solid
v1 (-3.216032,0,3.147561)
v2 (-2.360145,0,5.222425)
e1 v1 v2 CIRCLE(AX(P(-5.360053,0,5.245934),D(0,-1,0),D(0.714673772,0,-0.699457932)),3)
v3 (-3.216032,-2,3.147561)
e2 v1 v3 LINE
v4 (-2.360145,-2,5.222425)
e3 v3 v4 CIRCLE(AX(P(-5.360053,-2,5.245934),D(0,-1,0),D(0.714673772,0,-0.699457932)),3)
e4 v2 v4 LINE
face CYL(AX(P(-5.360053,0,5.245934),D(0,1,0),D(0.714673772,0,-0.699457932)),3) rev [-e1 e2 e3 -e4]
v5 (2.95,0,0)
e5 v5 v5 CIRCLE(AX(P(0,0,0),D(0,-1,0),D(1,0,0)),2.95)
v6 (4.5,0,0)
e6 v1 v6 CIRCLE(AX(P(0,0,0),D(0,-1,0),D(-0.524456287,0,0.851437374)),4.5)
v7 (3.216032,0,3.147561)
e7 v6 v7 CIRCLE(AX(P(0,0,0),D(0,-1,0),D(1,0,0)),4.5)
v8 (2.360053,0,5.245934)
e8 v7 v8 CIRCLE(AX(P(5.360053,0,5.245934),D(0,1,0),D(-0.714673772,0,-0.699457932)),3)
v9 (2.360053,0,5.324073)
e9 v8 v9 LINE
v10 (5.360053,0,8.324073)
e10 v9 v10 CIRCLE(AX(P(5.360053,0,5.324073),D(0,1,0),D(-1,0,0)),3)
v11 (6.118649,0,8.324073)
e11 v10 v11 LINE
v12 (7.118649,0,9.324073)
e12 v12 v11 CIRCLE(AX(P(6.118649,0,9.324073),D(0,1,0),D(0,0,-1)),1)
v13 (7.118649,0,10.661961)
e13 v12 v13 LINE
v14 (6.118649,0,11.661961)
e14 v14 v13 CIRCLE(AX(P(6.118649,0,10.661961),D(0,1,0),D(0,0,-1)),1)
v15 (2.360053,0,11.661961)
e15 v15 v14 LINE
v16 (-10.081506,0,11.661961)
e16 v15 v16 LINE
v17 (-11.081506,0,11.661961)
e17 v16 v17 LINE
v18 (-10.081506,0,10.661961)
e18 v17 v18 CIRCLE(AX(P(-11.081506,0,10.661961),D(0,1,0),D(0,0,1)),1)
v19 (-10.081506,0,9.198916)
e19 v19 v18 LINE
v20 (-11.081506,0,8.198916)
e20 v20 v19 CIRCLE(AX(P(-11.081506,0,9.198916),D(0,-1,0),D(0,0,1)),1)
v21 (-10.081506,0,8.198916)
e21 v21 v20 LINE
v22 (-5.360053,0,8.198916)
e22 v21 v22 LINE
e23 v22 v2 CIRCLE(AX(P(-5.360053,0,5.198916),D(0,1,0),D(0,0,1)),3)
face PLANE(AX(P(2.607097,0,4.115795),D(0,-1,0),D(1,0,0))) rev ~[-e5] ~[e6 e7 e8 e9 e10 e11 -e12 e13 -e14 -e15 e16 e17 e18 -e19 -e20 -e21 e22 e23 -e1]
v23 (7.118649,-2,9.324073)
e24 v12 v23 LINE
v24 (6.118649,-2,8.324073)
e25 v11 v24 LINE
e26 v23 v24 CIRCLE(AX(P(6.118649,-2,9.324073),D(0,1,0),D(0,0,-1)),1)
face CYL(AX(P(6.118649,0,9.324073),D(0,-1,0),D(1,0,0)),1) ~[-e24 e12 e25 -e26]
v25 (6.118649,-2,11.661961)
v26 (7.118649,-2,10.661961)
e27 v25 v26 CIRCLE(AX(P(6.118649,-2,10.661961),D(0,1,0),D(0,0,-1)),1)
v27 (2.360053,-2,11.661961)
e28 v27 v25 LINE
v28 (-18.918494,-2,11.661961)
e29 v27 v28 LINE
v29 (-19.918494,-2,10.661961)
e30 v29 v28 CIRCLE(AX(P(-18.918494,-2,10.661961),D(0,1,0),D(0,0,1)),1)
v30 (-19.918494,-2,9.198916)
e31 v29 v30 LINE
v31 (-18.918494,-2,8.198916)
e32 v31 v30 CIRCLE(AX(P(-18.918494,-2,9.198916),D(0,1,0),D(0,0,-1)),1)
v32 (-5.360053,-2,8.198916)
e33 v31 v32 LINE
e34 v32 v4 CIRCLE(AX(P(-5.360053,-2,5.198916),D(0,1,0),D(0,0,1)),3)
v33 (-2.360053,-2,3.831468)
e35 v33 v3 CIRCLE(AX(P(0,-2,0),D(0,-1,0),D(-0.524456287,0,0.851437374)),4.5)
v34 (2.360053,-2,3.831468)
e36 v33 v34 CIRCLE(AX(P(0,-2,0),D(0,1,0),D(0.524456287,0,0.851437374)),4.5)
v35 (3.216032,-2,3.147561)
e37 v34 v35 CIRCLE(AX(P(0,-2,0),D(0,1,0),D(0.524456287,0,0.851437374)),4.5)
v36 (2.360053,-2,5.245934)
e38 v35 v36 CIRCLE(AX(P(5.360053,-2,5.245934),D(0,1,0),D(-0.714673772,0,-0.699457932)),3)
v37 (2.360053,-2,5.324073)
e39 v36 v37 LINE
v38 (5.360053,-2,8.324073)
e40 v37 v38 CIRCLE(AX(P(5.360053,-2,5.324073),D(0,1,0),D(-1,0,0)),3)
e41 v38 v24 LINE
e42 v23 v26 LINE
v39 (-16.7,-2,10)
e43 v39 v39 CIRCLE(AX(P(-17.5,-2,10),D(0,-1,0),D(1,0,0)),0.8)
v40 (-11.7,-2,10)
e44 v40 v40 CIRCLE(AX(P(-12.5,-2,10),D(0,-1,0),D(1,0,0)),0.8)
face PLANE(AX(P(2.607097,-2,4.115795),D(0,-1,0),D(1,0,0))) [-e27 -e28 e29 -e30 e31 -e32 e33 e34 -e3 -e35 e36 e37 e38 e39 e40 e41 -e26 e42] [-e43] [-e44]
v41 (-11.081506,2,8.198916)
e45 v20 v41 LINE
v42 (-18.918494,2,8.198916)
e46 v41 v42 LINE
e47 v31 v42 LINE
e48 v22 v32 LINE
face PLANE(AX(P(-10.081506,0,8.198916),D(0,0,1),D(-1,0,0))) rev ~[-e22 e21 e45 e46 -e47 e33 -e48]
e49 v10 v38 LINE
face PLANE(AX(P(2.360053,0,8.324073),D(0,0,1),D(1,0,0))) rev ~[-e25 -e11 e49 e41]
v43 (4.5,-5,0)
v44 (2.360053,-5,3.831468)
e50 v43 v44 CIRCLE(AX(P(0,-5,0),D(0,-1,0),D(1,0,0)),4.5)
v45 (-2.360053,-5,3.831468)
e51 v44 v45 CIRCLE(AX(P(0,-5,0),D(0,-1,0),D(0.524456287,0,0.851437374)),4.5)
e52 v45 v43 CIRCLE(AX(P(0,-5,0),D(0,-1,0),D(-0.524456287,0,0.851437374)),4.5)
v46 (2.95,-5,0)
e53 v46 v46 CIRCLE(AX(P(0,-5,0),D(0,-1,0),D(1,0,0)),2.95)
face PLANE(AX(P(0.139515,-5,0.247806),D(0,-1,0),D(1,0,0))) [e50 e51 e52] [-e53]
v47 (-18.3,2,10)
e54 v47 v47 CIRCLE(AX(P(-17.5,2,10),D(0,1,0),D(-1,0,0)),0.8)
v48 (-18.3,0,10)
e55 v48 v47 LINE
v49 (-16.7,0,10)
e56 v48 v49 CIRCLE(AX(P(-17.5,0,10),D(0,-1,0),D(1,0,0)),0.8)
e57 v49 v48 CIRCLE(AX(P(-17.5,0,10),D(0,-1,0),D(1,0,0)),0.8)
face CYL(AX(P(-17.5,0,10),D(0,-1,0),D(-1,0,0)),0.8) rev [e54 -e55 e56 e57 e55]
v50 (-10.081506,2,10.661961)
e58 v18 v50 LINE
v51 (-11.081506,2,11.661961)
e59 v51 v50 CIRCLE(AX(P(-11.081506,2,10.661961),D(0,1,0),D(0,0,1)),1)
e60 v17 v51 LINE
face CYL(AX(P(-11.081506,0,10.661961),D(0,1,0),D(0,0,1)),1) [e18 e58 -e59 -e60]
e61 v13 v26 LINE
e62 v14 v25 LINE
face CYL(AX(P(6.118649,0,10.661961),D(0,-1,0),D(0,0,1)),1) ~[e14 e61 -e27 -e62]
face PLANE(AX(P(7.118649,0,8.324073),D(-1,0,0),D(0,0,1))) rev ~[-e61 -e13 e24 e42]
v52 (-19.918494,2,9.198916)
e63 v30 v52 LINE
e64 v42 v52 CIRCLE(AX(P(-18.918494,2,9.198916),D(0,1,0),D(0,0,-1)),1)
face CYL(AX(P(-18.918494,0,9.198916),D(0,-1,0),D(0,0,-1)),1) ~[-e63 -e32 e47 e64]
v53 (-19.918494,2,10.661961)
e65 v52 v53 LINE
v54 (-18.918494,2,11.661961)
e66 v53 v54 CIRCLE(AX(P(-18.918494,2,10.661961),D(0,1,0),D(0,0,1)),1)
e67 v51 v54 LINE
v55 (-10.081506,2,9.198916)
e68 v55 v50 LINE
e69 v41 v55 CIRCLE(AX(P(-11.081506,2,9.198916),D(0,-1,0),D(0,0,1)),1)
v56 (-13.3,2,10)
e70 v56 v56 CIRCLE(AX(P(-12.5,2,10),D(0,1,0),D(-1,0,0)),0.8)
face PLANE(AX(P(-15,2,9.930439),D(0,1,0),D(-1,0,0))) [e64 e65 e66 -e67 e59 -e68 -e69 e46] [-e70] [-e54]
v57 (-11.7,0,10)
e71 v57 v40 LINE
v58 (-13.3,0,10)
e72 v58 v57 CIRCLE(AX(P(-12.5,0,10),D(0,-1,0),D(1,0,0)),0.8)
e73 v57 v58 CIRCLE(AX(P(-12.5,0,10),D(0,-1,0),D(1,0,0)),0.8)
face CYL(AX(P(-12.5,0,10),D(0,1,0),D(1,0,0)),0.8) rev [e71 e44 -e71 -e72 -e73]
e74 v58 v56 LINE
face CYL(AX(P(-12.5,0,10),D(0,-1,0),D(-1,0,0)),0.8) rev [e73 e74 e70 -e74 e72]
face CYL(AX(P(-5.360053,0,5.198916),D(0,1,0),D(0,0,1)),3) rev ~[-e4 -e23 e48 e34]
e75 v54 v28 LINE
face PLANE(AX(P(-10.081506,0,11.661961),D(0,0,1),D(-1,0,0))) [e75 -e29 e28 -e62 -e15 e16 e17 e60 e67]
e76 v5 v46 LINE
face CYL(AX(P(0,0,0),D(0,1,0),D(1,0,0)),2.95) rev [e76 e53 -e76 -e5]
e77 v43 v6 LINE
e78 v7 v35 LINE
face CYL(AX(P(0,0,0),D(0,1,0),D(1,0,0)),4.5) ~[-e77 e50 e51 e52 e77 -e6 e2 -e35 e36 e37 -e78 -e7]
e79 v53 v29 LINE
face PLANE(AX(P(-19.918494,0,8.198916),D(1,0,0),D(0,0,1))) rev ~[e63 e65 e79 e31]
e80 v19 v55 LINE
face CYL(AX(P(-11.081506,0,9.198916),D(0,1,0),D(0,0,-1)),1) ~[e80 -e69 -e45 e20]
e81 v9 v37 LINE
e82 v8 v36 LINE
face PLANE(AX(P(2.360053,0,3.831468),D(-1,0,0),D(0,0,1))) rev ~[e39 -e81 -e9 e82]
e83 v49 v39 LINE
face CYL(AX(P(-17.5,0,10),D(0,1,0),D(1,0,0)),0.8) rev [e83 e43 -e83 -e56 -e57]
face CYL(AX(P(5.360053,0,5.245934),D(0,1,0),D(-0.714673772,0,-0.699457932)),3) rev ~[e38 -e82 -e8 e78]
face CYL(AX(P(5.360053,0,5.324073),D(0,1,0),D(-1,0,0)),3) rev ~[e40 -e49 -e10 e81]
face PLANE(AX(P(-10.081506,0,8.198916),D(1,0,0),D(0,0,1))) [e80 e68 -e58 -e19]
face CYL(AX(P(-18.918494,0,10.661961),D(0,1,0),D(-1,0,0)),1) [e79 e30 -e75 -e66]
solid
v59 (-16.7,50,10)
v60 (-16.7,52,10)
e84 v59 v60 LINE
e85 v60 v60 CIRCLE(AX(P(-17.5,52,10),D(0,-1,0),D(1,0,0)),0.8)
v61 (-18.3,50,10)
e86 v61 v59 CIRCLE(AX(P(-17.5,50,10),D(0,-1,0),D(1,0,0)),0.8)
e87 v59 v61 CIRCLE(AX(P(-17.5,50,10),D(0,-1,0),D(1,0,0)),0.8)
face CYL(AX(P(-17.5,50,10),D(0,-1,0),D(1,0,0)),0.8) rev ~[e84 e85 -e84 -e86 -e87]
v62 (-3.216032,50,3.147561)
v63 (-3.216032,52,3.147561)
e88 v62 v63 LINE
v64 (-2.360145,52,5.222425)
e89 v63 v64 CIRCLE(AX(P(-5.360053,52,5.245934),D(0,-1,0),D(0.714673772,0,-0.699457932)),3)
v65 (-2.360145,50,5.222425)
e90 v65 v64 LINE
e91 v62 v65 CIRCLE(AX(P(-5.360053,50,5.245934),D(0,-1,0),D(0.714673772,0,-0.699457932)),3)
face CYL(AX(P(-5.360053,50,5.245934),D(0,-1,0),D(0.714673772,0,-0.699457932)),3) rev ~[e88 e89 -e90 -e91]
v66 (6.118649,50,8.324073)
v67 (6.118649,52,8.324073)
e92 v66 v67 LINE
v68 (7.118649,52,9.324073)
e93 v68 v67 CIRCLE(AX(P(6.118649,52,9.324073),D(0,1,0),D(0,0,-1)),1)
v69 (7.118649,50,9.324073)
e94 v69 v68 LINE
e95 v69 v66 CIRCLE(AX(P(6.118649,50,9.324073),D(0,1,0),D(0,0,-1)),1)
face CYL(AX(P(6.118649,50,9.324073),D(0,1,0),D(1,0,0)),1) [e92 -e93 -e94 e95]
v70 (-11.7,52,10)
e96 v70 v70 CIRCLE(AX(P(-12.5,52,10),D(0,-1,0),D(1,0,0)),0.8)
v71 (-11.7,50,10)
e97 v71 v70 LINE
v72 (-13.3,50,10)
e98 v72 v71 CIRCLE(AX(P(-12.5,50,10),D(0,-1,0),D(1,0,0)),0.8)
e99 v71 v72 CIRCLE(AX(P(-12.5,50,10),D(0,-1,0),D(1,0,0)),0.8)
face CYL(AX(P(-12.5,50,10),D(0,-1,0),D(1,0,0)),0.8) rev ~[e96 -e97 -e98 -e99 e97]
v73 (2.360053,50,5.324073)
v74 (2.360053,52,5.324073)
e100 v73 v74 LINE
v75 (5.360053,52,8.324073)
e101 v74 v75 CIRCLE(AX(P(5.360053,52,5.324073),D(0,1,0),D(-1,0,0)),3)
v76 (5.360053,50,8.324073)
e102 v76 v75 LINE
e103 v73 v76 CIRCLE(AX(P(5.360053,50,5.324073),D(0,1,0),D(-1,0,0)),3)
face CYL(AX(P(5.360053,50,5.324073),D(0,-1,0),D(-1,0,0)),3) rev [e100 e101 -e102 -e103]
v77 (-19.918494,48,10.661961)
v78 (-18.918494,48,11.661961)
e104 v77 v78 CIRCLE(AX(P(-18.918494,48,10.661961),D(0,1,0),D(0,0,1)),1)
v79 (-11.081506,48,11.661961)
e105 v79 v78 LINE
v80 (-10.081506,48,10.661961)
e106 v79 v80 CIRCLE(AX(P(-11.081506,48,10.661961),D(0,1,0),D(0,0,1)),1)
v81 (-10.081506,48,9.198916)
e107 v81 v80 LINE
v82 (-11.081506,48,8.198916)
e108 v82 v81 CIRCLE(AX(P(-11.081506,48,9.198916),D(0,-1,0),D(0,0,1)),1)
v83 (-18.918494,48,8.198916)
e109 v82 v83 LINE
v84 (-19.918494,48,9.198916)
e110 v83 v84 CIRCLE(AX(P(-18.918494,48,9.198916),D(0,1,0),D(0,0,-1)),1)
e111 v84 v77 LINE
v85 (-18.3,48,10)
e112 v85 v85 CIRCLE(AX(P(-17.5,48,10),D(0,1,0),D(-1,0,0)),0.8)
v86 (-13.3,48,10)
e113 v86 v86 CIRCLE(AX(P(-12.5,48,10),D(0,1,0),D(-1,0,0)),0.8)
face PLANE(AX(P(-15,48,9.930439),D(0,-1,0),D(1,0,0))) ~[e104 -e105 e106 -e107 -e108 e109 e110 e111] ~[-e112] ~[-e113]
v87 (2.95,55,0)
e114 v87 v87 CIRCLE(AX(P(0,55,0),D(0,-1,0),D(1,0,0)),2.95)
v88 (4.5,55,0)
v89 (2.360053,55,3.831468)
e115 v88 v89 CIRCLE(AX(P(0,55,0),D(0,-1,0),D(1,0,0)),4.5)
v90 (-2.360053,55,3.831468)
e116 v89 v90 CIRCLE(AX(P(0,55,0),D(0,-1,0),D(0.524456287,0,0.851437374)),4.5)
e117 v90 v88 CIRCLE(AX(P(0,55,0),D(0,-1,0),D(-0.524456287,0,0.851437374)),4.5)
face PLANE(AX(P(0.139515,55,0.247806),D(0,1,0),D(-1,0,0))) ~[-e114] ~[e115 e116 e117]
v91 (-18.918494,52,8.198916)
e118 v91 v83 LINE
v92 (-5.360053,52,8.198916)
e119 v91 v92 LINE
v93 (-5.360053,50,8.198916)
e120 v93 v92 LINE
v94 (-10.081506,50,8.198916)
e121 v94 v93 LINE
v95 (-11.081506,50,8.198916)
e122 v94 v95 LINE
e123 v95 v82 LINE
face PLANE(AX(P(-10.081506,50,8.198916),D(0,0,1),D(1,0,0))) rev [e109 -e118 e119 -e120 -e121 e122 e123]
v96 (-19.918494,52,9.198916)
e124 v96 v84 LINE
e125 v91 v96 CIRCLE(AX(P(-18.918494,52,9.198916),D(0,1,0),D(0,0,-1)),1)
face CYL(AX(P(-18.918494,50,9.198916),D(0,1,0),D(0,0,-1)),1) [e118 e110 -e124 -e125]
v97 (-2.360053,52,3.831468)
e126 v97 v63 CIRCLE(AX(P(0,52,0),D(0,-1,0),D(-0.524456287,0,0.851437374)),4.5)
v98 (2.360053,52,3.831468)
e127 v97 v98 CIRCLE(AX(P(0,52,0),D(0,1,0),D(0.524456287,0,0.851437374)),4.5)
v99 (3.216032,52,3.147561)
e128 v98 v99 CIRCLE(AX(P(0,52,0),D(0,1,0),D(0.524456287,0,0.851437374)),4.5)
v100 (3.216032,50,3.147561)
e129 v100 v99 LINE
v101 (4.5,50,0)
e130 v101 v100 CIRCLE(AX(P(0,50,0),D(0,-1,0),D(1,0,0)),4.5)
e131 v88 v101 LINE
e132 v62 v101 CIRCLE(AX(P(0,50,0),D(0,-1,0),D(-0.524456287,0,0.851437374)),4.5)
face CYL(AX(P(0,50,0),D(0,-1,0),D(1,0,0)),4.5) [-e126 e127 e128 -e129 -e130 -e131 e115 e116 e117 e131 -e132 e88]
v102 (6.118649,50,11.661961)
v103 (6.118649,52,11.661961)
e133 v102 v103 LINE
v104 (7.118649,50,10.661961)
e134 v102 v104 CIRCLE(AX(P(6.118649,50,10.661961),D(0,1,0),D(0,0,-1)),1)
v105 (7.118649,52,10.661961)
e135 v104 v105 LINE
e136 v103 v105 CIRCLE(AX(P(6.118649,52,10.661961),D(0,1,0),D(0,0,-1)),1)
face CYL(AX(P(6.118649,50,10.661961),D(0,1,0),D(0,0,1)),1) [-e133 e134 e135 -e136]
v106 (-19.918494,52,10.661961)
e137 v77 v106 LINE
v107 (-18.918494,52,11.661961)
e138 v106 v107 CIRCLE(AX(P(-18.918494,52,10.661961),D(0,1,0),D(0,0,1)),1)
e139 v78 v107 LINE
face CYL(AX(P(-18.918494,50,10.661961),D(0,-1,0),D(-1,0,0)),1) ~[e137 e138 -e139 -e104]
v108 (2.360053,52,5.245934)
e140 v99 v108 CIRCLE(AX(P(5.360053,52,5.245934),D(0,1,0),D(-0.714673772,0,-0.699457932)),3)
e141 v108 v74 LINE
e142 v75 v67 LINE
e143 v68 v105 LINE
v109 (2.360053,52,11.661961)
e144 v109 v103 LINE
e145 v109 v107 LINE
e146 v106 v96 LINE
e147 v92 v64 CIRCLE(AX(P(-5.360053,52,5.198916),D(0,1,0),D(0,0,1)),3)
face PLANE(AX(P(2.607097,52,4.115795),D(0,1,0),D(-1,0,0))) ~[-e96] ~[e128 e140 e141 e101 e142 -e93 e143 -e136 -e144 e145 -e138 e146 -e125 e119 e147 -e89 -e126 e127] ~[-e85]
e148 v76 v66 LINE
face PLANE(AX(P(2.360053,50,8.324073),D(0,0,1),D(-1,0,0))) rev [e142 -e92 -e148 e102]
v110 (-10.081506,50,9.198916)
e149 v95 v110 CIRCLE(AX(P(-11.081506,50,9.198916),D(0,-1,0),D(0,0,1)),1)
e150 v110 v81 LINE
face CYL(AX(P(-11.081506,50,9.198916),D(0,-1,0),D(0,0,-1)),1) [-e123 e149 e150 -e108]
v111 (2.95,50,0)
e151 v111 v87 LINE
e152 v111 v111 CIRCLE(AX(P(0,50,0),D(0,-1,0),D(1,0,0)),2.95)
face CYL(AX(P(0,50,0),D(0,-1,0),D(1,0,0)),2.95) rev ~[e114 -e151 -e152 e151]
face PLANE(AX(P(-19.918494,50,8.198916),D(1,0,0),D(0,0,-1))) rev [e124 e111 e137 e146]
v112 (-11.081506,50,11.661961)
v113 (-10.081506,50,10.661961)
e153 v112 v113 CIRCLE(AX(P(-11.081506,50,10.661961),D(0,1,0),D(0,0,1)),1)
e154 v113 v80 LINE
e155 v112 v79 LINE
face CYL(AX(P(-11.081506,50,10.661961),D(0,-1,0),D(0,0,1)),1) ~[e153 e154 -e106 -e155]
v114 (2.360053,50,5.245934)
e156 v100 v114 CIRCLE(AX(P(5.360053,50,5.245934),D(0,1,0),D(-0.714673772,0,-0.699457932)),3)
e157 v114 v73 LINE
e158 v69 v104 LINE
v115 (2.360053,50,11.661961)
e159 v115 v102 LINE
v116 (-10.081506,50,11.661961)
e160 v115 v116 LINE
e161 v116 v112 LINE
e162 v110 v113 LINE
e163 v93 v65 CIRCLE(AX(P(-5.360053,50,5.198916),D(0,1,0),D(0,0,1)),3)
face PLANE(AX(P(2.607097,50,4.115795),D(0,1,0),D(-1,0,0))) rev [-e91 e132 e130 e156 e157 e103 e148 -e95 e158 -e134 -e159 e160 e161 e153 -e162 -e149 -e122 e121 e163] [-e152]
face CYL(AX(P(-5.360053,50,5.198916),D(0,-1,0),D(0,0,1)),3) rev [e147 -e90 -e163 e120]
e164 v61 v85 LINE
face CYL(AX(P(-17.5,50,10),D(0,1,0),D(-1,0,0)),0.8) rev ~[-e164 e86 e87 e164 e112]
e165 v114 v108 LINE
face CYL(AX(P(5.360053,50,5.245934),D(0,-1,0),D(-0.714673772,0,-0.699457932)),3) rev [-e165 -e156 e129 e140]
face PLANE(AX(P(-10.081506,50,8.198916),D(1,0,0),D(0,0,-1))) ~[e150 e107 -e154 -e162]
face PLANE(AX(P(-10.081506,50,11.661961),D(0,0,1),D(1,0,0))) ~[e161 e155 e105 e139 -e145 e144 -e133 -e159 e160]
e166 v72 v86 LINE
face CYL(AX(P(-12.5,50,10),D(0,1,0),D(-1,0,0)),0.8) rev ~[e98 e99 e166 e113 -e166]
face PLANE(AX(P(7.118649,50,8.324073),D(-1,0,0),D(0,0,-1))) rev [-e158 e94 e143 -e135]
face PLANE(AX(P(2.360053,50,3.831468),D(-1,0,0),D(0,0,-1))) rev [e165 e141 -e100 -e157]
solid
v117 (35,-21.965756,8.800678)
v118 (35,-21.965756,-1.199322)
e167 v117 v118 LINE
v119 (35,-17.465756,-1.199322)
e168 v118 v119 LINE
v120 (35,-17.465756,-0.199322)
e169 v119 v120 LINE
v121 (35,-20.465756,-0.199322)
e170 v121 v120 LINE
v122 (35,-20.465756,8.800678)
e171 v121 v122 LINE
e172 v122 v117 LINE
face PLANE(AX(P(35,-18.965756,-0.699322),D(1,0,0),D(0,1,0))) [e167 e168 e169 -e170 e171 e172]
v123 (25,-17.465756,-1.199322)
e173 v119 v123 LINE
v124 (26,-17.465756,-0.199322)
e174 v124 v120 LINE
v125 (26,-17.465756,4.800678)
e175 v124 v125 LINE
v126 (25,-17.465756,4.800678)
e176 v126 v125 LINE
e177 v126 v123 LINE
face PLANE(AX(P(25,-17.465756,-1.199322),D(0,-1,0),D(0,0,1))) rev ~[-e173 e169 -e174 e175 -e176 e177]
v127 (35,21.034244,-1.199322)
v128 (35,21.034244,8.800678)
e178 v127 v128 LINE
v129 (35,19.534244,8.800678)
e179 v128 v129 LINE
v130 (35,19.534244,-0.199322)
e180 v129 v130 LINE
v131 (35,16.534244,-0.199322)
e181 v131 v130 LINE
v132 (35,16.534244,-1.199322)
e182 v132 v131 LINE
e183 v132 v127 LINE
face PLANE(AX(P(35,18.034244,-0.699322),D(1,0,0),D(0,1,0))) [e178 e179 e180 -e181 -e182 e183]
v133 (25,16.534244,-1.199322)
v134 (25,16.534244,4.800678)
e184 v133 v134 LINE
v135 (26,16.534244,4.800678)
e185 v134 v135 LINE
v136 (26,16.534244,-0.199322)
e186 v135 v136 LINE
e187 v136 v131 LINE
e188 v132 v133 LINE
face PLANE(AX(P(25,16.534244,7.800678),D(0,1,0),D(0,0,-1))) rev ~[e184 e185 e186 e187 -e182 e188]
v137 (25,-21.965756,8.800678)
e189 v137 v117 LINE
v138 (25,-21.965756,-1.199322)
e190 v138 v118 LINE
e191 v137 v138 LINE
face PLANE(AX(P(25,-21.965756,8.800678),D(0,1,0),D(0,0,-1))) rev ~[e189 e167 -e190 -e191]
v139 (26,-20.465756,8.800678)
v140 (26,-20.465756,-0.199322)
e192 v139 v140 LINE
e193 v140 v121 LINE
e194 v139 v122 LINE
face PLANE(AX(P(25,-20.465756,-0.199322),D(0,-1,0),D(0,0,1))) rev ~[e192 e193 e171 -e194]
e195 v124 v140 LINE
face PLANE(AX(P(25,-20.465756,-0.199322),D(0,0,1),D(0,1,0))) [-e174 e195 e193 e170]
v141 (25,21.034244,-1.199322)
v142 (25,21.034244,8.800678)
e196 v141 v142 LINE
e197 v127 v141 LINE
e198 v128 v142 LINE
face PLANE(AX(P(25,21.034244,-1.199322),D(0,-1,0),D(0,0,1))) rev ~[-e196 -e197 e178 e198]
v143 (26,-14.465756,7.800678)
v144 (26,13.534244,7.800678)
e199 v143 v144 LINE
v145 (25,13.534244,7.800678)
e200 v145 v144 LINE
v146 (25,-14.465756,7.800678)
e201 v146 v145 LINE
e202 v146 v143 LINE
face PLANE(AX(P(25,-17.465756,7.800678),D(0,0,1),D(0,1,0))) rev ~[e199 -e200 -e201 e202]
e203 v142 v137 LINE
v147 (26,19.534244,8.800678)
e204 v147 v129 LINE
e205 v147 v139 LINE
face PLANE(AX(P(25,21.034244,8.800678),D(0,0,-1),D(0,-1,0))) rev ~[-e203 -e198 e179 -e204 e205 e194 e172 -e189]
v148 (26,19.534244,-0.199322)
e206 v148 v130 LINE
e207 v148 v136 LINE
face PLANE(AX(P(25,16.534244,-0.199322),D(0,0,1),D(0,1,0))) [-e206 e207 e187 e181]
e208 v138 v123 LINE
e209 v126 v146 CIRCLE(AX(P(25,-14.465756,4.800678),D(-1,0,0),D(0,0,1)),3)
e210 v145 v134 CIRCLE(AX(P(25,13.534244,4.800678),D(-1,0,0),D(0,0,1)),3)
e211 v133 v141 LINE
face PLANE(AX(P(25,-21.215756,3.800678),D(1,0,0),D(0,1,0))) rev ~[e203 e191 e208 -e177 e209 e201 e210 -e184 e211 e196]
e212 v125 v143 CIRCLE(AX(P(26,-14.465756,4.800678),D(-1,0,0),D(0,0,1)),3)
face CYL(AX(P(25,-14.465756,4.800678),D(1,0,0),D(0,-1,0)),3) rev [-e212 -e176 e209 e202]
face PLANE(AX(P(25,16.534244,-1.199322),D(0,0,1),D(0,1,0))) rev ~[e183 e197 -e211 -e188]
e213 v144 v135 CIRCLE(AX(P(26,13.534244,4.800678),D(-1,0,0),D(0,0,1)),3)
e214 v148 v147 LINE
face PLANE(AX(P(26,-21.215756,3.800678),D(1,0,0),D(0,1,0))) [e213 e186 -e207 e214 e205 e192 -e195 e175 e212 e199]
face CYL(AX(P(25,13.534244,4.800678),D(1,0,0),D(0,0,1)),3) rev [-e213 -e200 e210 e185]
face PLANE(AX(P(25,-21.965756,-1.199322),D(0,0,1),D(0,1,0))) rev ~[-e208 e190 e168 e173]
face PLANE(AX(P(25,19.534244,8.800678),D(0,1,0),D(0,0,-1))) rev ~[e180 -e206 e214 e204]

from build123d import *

# Parameters (mm, degrees)
F0_R        = 2.95
F0_R_2      = 0.8
F0_W        = 4.7585960214
F0_H        = 3.3378887317
F1_DEPTH    = 2
F2_W        = 9.8369888743
F2_H        = 3.4630449291
F2_R        = 0.8
F3_DEPTH    = 2
F4_DEPTH    = 5
F5_T1_DEPTH = 2
F6_R        = 1
F10_W       = 3
F10_H       = 8
F10_H_2     = 1
F11_DEPTH   = 1
F12_DEPTH   = 10
F13_R       = 3


# Not quite as in the source:
# - a fillet or chamfer that OpenCascade refuses, or shapes differently, is made with other operations: its cross-section is extruded or revolved along the edge and cut away or added


with BuildPart() as f1:
    # F0 (on Front) → F1 (new body)
    with BuildSketch(Plane.XZ):
        with BuildLine():
            ThreePointArc((-2.3600532936, 3.8314681848), (-2.1942835025, -3.9287555168), (4.5, 0))
            ThreePointArc((4.5, 0), (3.9287555168, 2.1942835025), (2.3600532936, 3.8314681848))
            ThreePointArc((2.3600532936, 3.8314681848), (0, 4.5), (-2.3600532936, 3.8314681848))
        make_face()
        Circle(F0_R, mode=Mode.SUBTRACT)
        with BuildLine():
            ThreePointArc((-2.3600532936, 3.8314681848), (0, 4.5), (2.3600532936, 3.8314681848))
            Line((2.3600532936, 3.8314681848), (2.3600532936, 6.6316658631))
            Line((2.3600532936, 6.6316658631), (-2.3600532936, 6.6316658631))
            Line((-2.3600532936, 6.6316658631), (-2.3600532936, 3.8314681848))
        make_face()
        Polygon((-2.3600532936, 6.6316658631), (2.3600532936, 6.6316658631), (2.3600532936, 8.3240726963), (2.3600532936, 11.6619614279), (-19.9184944371, 11.6619614279), (-19.9184944371, 8.1989164988), (-2.3600532936, 8.1989164988), align=None)
        with Locations((-17.5, 10)):
            Circle(F0_R_2, mode=Mode.SUBTRACT)
        with Locations((-12.5, 10)):
            Circle(F0_R_2, mode=Mode.SUBTRACT)
        with Locations((4.7393513044, 9.9930170621)):
            Rectangle(F0_W, F0_H)
    extrude(amount=F1_DEPTH)

    # F2 (on face) → F3 (join)
    with BuildSketch(Plane(origin=(0, 0, 0), x_dir=(-1, 0, 0), z_dir=(0, 1, 0))):
        with Locations((15, 9.9304389634)):
            Rectangle(F2_W, F2_H)
        with Locations((12.5, 10)):
            Circle(F2_R, mode=Mode.SUBTRACT)
        with Locations((17.5, 10)):
            Circle(F2_R, mode=Mode.SUBTRACT)
    extrude(amount=F3_DEPTH)

    # F0 (on Front) → F4 (join)
    with BuildSketch(Plane.XZ):
        with BuildLine():
            ThreePointArc((-2.3600532936, 3.8314681848), (-2.1942835025, -3.9287555168), (4.5, 0))
            ThreePointArc((4.5, 0), (3.9287555168, 2.1942835025), (2.3600532936, 3.8314681848))
            ThreePointArc((2.3600532936, 3.8314681848), (0, 4.5), (-2.3600532936, 3.8314681848))
        make_face()
        Circle(F0_R, mode=Mode.SUBTRACT)
    extrude(amount=F4_DEPTH)

    # F5: fillet of radius 3 on 4 edges, made by hand

    # F5_s2 → F5_t1 (join)
    with BuildSketch(Plane.XZ):
        with BuildLine():
            ThreePointArc((3.2160319762, 3.1475606949), (2.582278649, 4.1128113633), (2.3600532936, 5.2459344915))
            Line((2.3600532936, 5.2459344915), (2.3600532936, 3.8314681848))
            ThreePointArc((2.3600532936, 3.8314681848), (2.8089346909, 3.5156629392), (3.2160319762, 3.1475606949))
        make_face()
        with BuildLine():
            ThreePointArc((-5.3600532936, 8.1989164988), (-3.2387329501, 7.3202368424), (-2.3600532936, 5.1989164988))
            Line((-2.3600532936, 5.1989164988), (-2.3600532936, 8.1989164988))
            Line((-2.3600532936, 8.1989164988), (-5.3600532936, 8.1989164988))
        make_face()
        with BuildLine():
            ThreePointArc((-3.2160319762, 3.1475606949), (-2.582278649, 4.1128113633), (-2.3600532936, 5.2459344915))
            Line((-2.3600532936, 5.2459344915), (-2.3600532936, 3.8314681848))
            ThreePointArc((-2.3600532936, 3.8314681848), (-2.8089346909, 3.5156629392), (-3.2160319762, 3.1475606949))
        make_face()
        with BuildLine():
            ThreePointArc((2.3600532936, 5.3240726963), (3.2387329501, 7.4453930398), (5.3600532936, 8.3240726963))
            Line((5.3600532936, 8.3240726963), (2.3600532936, 8.3240726963))
            Line((2.3600532936, 8.3240726963), (2.3600532936, 5.3240726963))
        make_face()
    extrude(amount=F5_T1_DEPTH)

    # F6
    f6_edges = [f1.edges().sort_by_distance(p)[0] for p in [
        (-19.918494, 0, 11.661961),
        (-10.081506, 1, 11.661961),
        (-19.918494, 0, 8.198916),
        (-10.081506, 1, 8.198916),
        (7.118649, -1, 8.324073),
        (7.118649, -1, 11.661961),
    ]]
    fillet(f6_edges, radius=F6_R)


with BuildPart() as f8_1:
    # F8: instance of F1
    add(f1.part.mirror(Plane.XZ.offset(-25)))


with BuildPart() as f11:
    # F10 (on offset) → F11 (new body)
    with BuildSketch(Plane.YZ.offset(25)):
        Polygon((-20.4657563084, 8.8006782488), (-21.9657563084, 8.8006782488), (-21.9657563084, -1.1993217512), (-20.4657563084, -1.1993217512), (-20.4657563084, -0.1993217512), (-20.4657563084, 7.8006782488), align=None)
        Polygon((19.5342436916, 8.8006782488), (-20.4657563084, 8.8006782488), (-20.4657563084, 7.8006782488), (-17.4657563084, 7.8006782488), (16.5342436916, 7.8006782488), (19.5342436916, 7.8006782488), align=None)
        with Locations((-18.9657563084, 3.8006782488)):
            Rectangle(F10_W, F10_H)
        Polygon((21.0342436916, 8.8006782488), (19.5342436916, 8.8006782488), (19.5342436916, 7.8006782488), (19.5342436916, -0.1993217512), (19.5342436916, -1.1993217512), (21.0342436916, -1.1993217512), align=None)
        with Locations((-18.9657563084, -0.6993217512)):
            Rectangle(F10_W, F10_H_2)
        with Locations((18.0342436916, 3.8006782488)):
            Rectangle(F10_W, F10_H)
        with Locations((18.0342436916, -0.6993217512)):
            Rectangle(F10_W, F10_H_2)
    extrude(amount=F11_DEPTH)

    # F10 (on offset) → F12 (join)
    with BuildSketch(Plane.YZ.offset(25)):
        with Locations((18.0342436916, -0.6993217512)):
            Rectangle(F10_W, F10_H_2)
        with Locations((-18.9657563084, -0.6993217512)):
            Rectangle(F10_W, F10_H_2)
        Polygon((21.0342436916, 8.8006782488), (19.5342436916, 8.8006782488), (19.5342436916, 7.8006782488), (19.5342436916, -0.1993217512), (19.5342436916, -1.1993217512), (21.0342436916, -1.1993217512), align=None)
        Polygon((-20.4657563084, 8.8006782488), (-21.9657563084, 8.8006782488), (-21.9657563084, -1.1993217512), (-20.4657563084, -1.1993217512), (-20.4657563084, -0.1993217512), (-20.4657563084, 7.8006782488), align=None)
    extrude(amount=F12_DEPTH)

    # F13
    f13_edges = [f11.edges().sort_by_distance(p)[0] for p in [
        (25.5, 16.534244, 7.800678),
        (25.5, -17.465756, 7.800678),
    ]]
    fillet(f13_edges, radius=F13_R)


solid = Compound([f1.part, f8_1.part, f11.part])
